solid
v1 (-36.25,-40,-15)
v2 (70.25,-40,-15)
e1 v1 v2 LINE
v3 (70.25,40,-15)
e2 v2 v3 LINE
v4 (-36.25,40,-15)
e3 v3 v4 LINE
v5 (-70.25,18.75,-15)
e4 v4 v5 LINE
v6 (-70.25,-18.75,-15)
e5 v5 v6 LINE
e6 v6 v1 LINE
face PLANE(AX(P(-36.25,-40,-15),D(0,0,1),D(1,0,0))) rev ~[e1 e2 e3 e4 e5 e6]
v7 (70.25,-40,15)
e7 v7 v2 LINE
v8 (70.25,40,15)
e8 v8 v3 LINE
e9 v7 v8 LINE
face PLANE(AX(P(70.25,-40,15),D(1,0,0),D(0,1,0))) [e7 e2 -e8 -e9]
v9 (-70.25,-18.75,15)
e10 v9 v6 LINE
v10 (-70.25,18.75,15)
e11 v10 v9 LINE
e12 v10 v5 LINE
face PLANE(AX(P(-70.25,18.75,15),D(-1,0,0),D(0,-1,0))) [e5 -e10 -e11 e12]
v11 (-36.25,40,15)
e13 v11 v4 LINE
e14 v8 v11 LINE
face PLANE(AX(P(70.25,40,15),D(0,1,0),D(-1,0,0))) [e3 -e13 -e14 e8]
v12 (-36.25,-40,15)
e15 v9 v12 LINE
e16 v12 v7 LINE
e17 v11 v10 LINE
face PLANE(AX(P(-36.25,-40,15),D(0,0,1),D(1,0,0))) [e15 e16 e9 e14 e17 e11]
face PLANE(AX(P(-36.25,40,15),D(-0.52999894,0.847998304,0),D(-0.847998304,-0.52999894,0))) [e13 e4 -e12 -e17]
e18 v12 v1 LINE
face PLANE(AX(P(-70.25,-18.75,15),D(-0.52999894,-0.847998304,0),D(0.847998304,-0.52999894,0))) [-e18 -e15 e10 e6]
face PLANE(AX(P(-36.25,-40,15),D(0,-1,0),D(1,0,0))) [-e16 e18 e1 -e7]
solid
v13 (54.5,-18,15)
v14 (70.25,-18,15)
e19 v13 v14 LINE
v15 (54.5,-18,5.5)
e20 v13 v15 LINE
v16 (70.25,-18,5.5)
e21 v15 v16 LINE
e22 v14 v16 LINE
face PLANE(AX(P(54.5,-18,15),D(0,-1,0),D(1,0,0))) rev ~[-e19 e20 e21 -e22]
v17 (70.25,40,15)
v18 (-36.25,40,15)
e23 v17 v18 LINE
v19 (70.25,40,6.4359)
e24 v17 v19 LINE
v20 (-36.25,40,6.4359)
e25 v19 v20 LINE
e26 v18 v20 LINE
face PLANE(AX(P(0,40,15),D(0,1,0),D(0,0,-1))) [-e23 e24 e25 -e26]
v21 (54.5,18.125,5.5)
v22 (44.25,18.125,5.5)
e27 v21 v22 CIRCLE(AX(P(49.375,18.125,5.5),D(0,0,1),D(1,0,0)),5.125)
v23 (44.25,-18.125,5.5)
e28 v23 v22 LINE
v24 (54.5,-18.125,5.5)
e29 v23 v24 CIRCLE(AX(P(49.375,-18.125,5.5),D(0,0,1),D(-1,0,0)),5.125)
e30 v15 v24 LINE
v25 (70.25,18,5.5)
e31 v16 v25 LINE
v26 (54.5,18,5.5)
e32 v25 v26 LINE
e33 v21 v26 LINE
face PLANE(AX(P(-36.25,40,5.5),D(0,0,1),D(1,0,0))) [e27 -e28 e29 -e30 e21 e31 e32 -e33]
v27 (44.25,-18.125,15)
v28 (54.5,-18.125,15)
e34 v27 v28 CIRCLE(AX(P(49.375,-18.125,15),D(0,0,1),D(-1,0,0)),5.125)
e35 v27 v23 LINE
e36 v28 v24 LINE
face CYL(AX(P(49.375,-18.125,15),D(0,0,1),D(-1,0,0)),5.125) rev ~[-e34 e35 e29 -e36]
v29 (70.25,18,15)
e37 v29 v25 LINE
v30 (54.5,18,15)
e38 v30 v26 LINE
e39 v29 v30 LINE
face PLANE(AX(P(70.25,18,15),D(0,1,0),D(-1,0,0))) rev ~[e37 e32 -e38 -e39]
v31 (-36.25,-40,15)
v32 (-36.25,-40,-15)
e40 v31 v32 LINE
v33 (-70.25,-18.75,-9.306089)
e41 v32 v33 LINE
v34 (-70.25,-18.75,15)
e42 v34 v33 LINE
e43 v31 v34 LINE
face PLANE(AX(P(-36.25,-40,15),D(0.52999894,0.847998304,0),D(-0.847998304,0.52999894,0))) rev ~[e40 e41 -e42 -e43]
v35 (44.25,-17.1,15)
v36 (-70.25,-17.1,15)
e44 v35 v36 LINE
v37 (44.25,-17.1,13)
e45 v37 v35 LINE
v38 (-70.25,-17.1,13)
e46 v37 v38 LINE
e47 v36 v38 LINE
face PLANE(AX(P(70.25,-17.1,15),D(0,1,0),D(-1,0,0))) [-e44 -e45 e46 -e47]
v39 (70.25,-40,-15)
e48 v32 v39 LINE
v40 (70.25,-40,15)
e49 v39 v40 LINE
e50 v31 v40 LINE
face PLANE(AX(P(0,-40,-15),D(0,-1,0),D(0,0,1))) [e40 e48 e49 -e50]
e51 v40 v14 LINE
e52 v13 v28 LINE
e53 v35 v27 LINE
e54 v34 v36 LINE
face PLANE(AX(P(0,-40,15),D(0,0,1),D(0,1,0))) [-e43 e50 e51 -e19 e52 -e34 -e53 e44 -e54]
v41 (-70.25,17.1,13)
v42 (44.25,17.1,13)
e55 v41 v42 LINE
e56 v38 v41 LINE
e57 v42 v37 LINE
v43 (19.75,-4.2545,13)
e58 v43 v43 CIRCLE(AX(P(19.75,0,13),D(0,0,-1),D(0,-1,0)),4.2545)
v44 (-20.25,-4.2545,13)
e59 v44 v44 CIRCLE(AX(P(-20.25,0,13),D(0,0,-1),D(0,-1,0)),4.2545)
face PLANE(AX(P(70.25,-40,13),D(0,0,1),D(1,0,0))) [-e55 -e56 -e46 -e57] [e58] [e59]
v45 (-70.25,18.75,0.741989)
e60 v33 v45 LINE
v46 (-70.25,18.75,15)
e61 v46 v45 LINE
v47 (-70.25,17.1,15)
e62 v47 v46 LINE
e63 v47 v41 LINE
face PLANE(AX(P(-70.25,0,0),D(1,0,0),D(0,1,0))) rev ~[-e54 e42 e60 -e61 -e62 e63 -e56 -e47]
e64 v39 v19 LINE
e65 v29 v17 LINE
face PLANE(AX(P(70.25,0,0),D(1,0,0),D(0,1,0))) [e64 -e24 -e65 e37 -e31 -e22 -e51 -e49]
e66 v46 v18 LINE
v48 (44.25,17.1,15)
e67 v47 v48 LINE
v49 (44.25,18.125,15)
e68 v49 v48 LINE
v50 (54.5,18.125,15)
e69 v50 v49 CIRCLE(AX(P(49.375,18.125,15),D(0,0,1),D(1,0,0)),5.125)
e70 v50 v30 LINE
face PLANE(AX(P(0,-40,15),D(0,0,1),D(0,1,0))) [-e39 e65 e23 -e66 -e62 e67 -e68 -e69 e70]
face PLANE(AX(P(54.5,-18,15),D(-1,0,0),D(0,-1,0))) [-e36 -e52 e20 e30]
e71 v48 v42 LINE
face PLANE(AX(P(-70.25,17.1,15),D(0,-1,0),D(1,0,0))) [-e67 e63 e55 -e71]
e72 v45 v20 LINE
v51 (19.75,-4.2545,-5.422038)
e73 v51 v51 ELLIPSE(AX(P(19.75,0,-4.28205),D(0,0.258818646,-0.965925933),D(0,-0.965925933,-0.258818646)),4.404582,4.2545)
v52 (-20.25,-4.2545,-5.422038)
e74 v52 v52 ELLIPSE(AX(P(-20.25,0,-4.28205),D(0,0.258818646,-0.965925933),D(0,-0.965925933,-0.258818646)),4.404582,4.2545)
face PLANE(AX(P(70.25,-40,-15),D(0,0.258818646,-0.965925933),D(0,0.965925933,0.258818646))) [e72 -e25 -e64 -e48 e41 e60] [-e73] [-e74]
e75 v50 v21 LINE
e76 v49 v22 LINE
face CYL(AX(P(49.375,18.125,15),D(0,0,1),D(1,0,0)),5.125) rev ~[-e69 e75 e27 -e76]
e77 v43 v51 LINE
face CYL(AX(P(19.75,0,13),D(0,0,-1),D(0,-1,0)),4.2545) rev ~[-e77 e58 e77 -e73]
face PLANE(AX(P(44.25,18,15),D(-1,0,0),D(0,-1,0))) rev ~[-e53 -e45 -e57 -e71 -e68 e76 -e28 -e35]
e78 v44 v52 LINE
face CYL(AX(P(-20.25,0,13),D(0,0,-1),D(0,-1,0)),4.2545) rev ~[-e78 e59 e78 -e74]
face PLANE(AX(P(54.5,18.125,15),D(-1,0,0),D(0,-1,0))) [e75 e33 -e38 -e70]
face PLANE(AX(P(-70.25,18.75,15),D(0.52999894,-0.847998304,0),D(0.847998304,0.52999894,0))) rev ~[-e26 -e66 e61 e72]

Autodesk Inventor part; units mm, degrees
ref_plane "Work Plane1" through (-36.25, -40, 33.1737) normal (0, 0, -1) x (-1, 0, 0)
ref_plane "Right" through (0, 0, 0) normal (1, 0, 0) x (0, 1, 0)
ref_plane "Top" through (0, 0, 0) normal (0, 1, 0) x (-1, 0, 0)
sketch "Sketch1" plane through (0, 0, 0) normal (1, 0, 0) x (0, 1, 0)
  line L0 (-40, 15) -> (40, 15)
  line L1 (40, 15) -> (40, -15)
  line L2 (40, -15) -> (-40, -15)
  line L3 (-40, -15) -> (-40, 15)
  line L4 (-40, 15) -> (40, -15) construction
  line L5 (40, 15) -> (-40, -15) construction
  point P0 (0, 0)
  dimension "d0" = 30
  dimension "d1" = 80
extrude "Extrusion1" add sketch "Sketch1" along normal mid plane 140.5
sketch "Sketch2" plane through (-70.25, -40, 15) normal (0, 0, 1) x (1, 0, 0)
  line L0 (140.5, 80) -> (0, 80) construction
  line L1 (0, 0) -> (0, 80) construction
  line L2 (0, 80) -> (0, 58.75)
  line L3 (0, 58.75) -> (34, 80)
  line L4 (34, 80) -> (0, 80)
  line L5 (0, 21.25) -> (0, 0)
  line L6 (0, 0) -> (34, 0)
  line L7 (34, 0) -> (0, 21.25)
  point P0 (70.25, 40)
  dimension "d4" = 37.5
  dimension "d5" = 106.5
  dimension "d6" = 147.995
extrude "Extrusion2" cut sketch "Sketch2" against normal through all
sketch "Sketch3" plane through (70.25, -40, 15) normal (0, 0, 1) x (1, 0, 0)
  line L0 (0, 80) -> (0, 0) construction
  line L1 (-140.5, 21.25) -> (-140.5, 58.75) construction
  line L2 (-140.5, 57.1) -> (0, 57.1)
  line L3 (0, 57.1) -> (0, 22.9)
  line L4 (0, 22.9) -> (-140.5, 22.9)
  line L5 (-140.5, 22.9) -> (-140.5, 57.1)
  point P0 (-70.25, 40)
  point P1 (-140.5, 40)
  dimension "d9" = 34.2
extrude "Extrusion3" cut sketch "Sketch3" against normal blind 2
sketch "Sketch4" plane through (-36.25, 40, 15) normal (0, 0, 1) x (1, 0, 0)
  line L0 (106.5, -57.1) -> (-34, -57.1) construction
  line L1 (-34, -58.75) -> (-34, -57.1) construction
  line L2 (-34, -58.75) -> (0, -80) construction
  line L3 (0, -80) -> (106.5, -80) construction
  line L4 (106.5, -57.1) -> (106.5, -80) construction
  line L5 (-34, -22.9) -> (106.5, -22.9) construction
  line L6 (-34, -57.1) -> (-34, -22.9) construction
  line L7 (106.5, -57.1) -> (-34, -57.1) construction
  line L8 (106.5, -22.9) -> (106.5, -57.1) construction
  line L9 (106.5, -22) -> (80.5, -22)
  line L10 (80.5, -22) -> (80.5, -58)
  line L11 (80.5, -58) -> (106.5, -58)
  line L12 (106.5, -58) -> (106.5, -22)
  line L13 (85.625, -21.875) -> (85.625, -58.125) construction
  line L14 (90.75, -21.875) -> (90.75, -58.125)
  line L15 (80.5, -58.125) -> (80.5, -21.875)
  arc A0 (90.75, -21.875) -> (80.5, -21.875) centre (85.625, -21.875) ccw
  arc A1 (80.5, -58.125) -> (90.75, -58.125) centre (85.625, -58.125) ccw
  point P0 (36.25, -40)
  point P1 (106.5, -40)
  point P2 (85.625, -40)
  point P3 (80.5, -40)
  dimension "d12" = 36
  dimension "d13" = 26
  dimension "d14" = 46.5
  dimension "d15" = 15.75
extrude "Extrusion4" cut sketch "Sketch4" against normal blind 9.5
sketch "Sketch5" plane through (70.25, -40, 13) normal (0, 0, 1) x (1, 0, 0)
  line L0 (-26, 22.9) -> (-26, 57.1) construction
  line L1 (-15.75, 58) -> (0, 58) construction
  line L2 (-15.75, 58.125) -> (-15.75, 58) construction
  arc A0 (-15.75, 58.125) -> (-26, 58.125) centre (-20.875, 58.125) ccw construction
  line L3 (-26, 21.875) -> (-26, 58.125) construction
  arc A1 (-26, 21.875) -> (-15.75, 21.875) centre (-20.875, 21.875) ccw construction
  line L4 (-15.75, 22) -> (-15.75, 21.875) construction
  line L5 (0, 22) -> (-15.75, 22) construction
  line L6 (0, 58) -> (0, 22) construction
  line L7 (-90.5, 40) -> (-50.5, 40)
  circle A2 centre (-90.5, 40) radius 4.25
  circle A3 centre (-50.5, 40) radius 4.25
  point P0 (-70.25, 40)
  dimension "d18" = 8.5
  dimension "d19" = 48.5
  dimension "d20" = 20.25
  dimension "d23" = 50.5
  dimension "d24" = 40
hole "Hole1" at (-20.25, 0, 13) at (19.75, 0, 13) direction (0, 0, -1) diameter 8.509 end through all
sketch "Sketch6" plane through (70.25, 0, 0) normal (1, 0, 0) x (0, 0, -1)
  line L0 (15, -40) -> (15, 40) construction
  line L1 (15, 40) -> (-15, 40) construction
  line L2 (15, -40) -> (-6.4359, 40)
  line L3 (-6.4359, 40) -> (15, 40)
  line L4 (15, 40) -> (15, -40)
  point P0 (0, 0)
  dimension "d32" = 15
extrude "Extrusion5" cut sketch "Sketch6" against normal through all
sketch "Sketch7" plane through (-36.25, -40, 15) normal (0, 0, 1) x (1, 0, 0)
  line L0 (80.5, 57.1) -> (80.5, 58.125) construction
  arc A0 (90.75, 58.125) -> (80.5, 58.125) centre (85.625, 58.125) ccw construction
  line L1 (90.75, 58.125) -> (90.75, 58) construction
  line L2 (90.75, 58) -> (106.5, 58) construction
  line L3 (106.5, 80) -> (106.5, 58) construction
  line L4 (106.5, 80) -> (0, 80) construction
  line L5 (0, 80) -> (-34, 58.75) construction
  line L6 (-34, 57.1) -> (-34, 58.75) construction
  line L7 (-34, 57.1) -> (80.5, 57.1) construction
  line L8 (106.5, 80) -> (0, 80) construction
  line L9 (106.5, 0) -> (106.5, 80)
  line L10 (106.5, 80) -> (0, 80) construction
  line L11 (106.5, 80) -> (0, 80)
  line L12 (0, 80) -> (-34, 58.75)
  line L13 (0, 80) -> (-34, 58.75) construction
  line L14 (-34, 58.75) -> (-34, 21.25)
  line L15 (-34, 21.25) -> (0, 0)
  line L16 (106.5, 0) -> (106.5, 80) construction
  line L17 (0, 0) -> (106.5, 0)
  point P0 (36.25, 40)
extrude "Extrusion6" add sketch "Sketch7" against normal up to surface (30 mm away) separate body
sketch "Sketch8" plane through (70.25, -40, 13) normal (0, 0, 1) x (1, 0, 0)
  circle A0 centre (-90.5, 40) radius 4.2545 construction
  circle A1 centre (-50.5, 40) radius 4.2545 construction
  line L0 (-26, 22.9) -> (-26, 57.1) construction
  line L1 (-140.5, 57.1) -> (-26, 57.1) construction
  line L2 (-140.5, 22.9) -> (-140.5, 57.1) construction
  line L3 (-26, 22.9) -> (-140.5, 22.9) construction
  line L4 (0, 58) -> (0, 22) construction
  line L5 (12.7, 57.1) -> (-162.725, 57.1)
  line L6 (-162.725, 57.1) -> (-162.725, 22.9)
  line L7 (-162.725, 22.9) -> (12.7, 22.9)
  point P0 (-70.25, 40)
  dimension "d39" = 22.225
  dimension "d40" = 12.7
sketch "Sketch9" plane through (70.25, 40, 6.4359) normal (0, 0.258819, -0.9659258) x (-1, 0, 0)
  line L0 (140.5, -60.8225) -> (106.5, -82.8221) construction
  line L1 (140.5, -21.9996) -> (140.5, -60.8225) construction
  line L2 (106.5, 0) -> (140.5, -21.9996) construction
  line L3 (0, 0) -> (106.5, 0) construction
  line L4 (0, -82.8221) -> (0, 0) construction
  line L5 (0, -82.8221) -> (106.5, -82.8221) construction
  ellipse E0 centre (90.5, -41.411) end of major axis (90.5, -37.0065) minor radius 4.2545 construction
  ellipse E1 centre (50.5, -41.411) end of major axis (50.5, -37.0065) minor radius 4.2545 construction
  line L6 (0, -41.411) -> (140.5, -41.411)
  point P0 (70.25, -40.3028)
sketch "Sketch10" plane through (-36.25, -40, 15) normal (0, 0, 1) x (1, 0, 0)
  line L0 (80.5, 57.1) -> (80.5, 58.125) construction
  arc A0 (90.75, 58.125) -> (80.5, 58.125) centre (85.625, 58.125) ccw construction
  line L1 (90.75, 58.125) -> (90.75, 58) construction
  line L2 (90.75, 58) -> (106.5, 58) construction
  line L3 (106.5, 80) -> (106.5, 58) construction
  line L4 (106.5, 80) -> (0, 80) construction
  line L5 (0, 80) -> (-34, 58.75) construction
  line L6 (-34, 57.1) -> (-34, 58.75) construction
  line L7 (-34, 57.1) -> (80.5, 57.1) construction
  line L8 (90.75, 58) -> (106.5, 58) construction
  line L9 (90.75, 58.125) -> (90.75, 58) construction
  arc A1 (90.75, 58.125) -> (80.5, 58.125) centre (85.625, 58.125) ccw construction
  line L10 (80.5, 21.875) -> (80.5, 58.125) construction
  arc A2 (80.5, 21.875) -> (90.75, 21.875) centre (85.625, 21.875) ccw construction
  line L11 (90.75, 22) -> (90.75, 21.875) construction
  line L12 (106.5, 22) -> (90.75, 22) construction
  line L13 (106.5, 58) -> (106.5, 22) construction
  circle A3 centre (16, 40) radius 4.2545 construction
  circle A4 centre (56, 40) radius 4.2545 construction
  line L14 (80.5, 22.9) -> (80.5, 57.1) construction
  line L15 (-34, 57.1) -> (80.5, 57.1) construction
  line L16 (-34, 22.9) -> (-34, 57.1) construction
  line L17 (80.5, 22.9) -> (-34, 22.9) construction
  line L18 (112.45, 94.0004) -> (-39.95, 94.0004)
  line L19 (-39.95, 94.0004) -> (-39.95, -14.0004)
  line L20 (-39.95, -14.0004) -> (112.45, -14.0004)
  line L21 (112.45, -14.0004) -> (112.45, 94.0004)
  line L22 (-34, 40) -> (106.5, 40) construction
  line L23 (112.45, 94.0004) -> (-39.95, -14.0004) construction
  point P0 (36.25, 40)
  point P1 (36.25, 40)
  dimension "d41" = 152.4
  dimension "d42" = 108.0008
sketch "Sketch13" plane through (76.2, -54.0004, 15) normal (1, 0, 0) x (0, 0, -1)
  line L0 (0, 0) -> (0, 108.0008) construction
  line L1 (0, 0) -> (-36.8046, 0) construction
  line L2 (-10.5083, 0) -> (-36.8046, 98.139)
  line L3 (30, 14.0004) -> (8.5641, 94.0004) construction
  line L4 (-36.8046, 108.0008) -> (-36.8046, 0)
  line L5 (-10.5083, 0) -> (-36.8046, 0)
  line L6 (-36.8046, 0) -> (-36.8046, 108.0008) construction
  line L7 (0, 108.0008) -> (-36.8046, 98.139)
  line L8 (0, 108.0008) -> (-36.8046, 108.0008)
  line L9 (-10.5083, 0) -> (0, 2.8157)
  line L10 (0, 2.8157) -> (0, 0)
  line L11 (0, 0) -> (-10.5083, 0)
  line L12 (-36.8046, 98.139) -> (-10.5083, 0)
  line L13 (-10.5083, 0) -> (-36.8046, 0)
  line L14 (-36.8046, 0) -> (-36.8046, 98.139)
  line L15 (0, 108.0008) -> (-36.8046, 108.0008) construction
  line L16 (0, 108.0008) -> (-36.8046, 98.139)
  line L17 (-36.8046, 98.139) -> (-36.8046, 108.0008)
  line L18 (-36.8046, 108.0008) -> (0, 108.0008)
  point P0 (15, 54.0004)
  dimension "d67" = 101.601
  dimension "d75" = 38.1029
sketch "Sketch12" plane through (-36.25, -40, 51.8046) normal (0, 0, 1) x (1, 0, 0)
  circle A0 centre (16, 40) radius 4.2545 construction
  circle A1 centre (56, 40) radius 4.2545 construction
  line L0 (80.5, 22.9) -> (80.5, 57.1) construction
  line L1 (-34, 57.1) -> (80.5, 57.1) construction
  line L2 (-34, 22.9) -> (-34, 57.1) construction
  line L3 (80.5, 22.9) -> (-34, 22.9) construction
  point P0 (36.25, 40)
sketch "Sketch15" plane through (-36.25, -40, 33.1737) normal (0, 0, -1) x (-1, 0, 0)
  circle A0 centre (-56, 40) radius 5.4991 construction
  circle A1 centre (-16, 40) radius 5.4991 construction
  line L0 (9.4, 65.4) -> (-81.4, 65.4)
  line L1 (-81.4, 65.4) -> (-81.4, -10.8)
  line L2 (-81.4, -10.8) -> (9.4, -10.8)
  line L3 (9.4, -10.8) -> (9.4, 65.4)
  line L4 (9.4, 65.4) -> (-81.4, -10.8) construction
  line L5 (-81.4, 65.4) -> (9.4, -10.8) construction
  point P0 (-36, 27.3)
  dimension "d76" = 25.4
  dimension "d77" = 25.4
  dimension "d78" = 25.4
  dimension "d79" = 50.8
sketch "Sketch17" plane through (76.2, -51.1847, 15) normal (1, 0, 0) x (0, 0, -1)
  line L0 (-10.5083, -2.8157) -> (0, 0) projected
  line L1 (0, 0) -> (0, 105.1851) projected
  line L2 (0, 105.1851) -> (-36.8046, 95.3233) projected
  line L3 (-36.8046, 95.3233) -> (-10.5083, -2.8157) projected
  line L4 (0, 0) -> (26.2963, 7.0461)
  line L5 (26.2963, 7.0461) -> (0, 105.1851)
  point P0 (15, 51.1847)
equation "\"BendRadius\" = Thickness"
equation "\"BendReliefWidth\" = 0.5 * Thickness"
equation "\"BendReliefDepth\" = 0.5 * Thickness"
equation "\"CornerReliefSize\" = 4 * Thickness"
equation "\"MinimumRemnant\" = 2 * Thickness"
equation "\"TransitionRadius\" = BendRadius"
equation "\"JacobiRadiusSize\" = BendRadius"
equation "\"Thickness\" = 6.35"
properties part number "DHC-1500-FF-02-003" material "A36"
